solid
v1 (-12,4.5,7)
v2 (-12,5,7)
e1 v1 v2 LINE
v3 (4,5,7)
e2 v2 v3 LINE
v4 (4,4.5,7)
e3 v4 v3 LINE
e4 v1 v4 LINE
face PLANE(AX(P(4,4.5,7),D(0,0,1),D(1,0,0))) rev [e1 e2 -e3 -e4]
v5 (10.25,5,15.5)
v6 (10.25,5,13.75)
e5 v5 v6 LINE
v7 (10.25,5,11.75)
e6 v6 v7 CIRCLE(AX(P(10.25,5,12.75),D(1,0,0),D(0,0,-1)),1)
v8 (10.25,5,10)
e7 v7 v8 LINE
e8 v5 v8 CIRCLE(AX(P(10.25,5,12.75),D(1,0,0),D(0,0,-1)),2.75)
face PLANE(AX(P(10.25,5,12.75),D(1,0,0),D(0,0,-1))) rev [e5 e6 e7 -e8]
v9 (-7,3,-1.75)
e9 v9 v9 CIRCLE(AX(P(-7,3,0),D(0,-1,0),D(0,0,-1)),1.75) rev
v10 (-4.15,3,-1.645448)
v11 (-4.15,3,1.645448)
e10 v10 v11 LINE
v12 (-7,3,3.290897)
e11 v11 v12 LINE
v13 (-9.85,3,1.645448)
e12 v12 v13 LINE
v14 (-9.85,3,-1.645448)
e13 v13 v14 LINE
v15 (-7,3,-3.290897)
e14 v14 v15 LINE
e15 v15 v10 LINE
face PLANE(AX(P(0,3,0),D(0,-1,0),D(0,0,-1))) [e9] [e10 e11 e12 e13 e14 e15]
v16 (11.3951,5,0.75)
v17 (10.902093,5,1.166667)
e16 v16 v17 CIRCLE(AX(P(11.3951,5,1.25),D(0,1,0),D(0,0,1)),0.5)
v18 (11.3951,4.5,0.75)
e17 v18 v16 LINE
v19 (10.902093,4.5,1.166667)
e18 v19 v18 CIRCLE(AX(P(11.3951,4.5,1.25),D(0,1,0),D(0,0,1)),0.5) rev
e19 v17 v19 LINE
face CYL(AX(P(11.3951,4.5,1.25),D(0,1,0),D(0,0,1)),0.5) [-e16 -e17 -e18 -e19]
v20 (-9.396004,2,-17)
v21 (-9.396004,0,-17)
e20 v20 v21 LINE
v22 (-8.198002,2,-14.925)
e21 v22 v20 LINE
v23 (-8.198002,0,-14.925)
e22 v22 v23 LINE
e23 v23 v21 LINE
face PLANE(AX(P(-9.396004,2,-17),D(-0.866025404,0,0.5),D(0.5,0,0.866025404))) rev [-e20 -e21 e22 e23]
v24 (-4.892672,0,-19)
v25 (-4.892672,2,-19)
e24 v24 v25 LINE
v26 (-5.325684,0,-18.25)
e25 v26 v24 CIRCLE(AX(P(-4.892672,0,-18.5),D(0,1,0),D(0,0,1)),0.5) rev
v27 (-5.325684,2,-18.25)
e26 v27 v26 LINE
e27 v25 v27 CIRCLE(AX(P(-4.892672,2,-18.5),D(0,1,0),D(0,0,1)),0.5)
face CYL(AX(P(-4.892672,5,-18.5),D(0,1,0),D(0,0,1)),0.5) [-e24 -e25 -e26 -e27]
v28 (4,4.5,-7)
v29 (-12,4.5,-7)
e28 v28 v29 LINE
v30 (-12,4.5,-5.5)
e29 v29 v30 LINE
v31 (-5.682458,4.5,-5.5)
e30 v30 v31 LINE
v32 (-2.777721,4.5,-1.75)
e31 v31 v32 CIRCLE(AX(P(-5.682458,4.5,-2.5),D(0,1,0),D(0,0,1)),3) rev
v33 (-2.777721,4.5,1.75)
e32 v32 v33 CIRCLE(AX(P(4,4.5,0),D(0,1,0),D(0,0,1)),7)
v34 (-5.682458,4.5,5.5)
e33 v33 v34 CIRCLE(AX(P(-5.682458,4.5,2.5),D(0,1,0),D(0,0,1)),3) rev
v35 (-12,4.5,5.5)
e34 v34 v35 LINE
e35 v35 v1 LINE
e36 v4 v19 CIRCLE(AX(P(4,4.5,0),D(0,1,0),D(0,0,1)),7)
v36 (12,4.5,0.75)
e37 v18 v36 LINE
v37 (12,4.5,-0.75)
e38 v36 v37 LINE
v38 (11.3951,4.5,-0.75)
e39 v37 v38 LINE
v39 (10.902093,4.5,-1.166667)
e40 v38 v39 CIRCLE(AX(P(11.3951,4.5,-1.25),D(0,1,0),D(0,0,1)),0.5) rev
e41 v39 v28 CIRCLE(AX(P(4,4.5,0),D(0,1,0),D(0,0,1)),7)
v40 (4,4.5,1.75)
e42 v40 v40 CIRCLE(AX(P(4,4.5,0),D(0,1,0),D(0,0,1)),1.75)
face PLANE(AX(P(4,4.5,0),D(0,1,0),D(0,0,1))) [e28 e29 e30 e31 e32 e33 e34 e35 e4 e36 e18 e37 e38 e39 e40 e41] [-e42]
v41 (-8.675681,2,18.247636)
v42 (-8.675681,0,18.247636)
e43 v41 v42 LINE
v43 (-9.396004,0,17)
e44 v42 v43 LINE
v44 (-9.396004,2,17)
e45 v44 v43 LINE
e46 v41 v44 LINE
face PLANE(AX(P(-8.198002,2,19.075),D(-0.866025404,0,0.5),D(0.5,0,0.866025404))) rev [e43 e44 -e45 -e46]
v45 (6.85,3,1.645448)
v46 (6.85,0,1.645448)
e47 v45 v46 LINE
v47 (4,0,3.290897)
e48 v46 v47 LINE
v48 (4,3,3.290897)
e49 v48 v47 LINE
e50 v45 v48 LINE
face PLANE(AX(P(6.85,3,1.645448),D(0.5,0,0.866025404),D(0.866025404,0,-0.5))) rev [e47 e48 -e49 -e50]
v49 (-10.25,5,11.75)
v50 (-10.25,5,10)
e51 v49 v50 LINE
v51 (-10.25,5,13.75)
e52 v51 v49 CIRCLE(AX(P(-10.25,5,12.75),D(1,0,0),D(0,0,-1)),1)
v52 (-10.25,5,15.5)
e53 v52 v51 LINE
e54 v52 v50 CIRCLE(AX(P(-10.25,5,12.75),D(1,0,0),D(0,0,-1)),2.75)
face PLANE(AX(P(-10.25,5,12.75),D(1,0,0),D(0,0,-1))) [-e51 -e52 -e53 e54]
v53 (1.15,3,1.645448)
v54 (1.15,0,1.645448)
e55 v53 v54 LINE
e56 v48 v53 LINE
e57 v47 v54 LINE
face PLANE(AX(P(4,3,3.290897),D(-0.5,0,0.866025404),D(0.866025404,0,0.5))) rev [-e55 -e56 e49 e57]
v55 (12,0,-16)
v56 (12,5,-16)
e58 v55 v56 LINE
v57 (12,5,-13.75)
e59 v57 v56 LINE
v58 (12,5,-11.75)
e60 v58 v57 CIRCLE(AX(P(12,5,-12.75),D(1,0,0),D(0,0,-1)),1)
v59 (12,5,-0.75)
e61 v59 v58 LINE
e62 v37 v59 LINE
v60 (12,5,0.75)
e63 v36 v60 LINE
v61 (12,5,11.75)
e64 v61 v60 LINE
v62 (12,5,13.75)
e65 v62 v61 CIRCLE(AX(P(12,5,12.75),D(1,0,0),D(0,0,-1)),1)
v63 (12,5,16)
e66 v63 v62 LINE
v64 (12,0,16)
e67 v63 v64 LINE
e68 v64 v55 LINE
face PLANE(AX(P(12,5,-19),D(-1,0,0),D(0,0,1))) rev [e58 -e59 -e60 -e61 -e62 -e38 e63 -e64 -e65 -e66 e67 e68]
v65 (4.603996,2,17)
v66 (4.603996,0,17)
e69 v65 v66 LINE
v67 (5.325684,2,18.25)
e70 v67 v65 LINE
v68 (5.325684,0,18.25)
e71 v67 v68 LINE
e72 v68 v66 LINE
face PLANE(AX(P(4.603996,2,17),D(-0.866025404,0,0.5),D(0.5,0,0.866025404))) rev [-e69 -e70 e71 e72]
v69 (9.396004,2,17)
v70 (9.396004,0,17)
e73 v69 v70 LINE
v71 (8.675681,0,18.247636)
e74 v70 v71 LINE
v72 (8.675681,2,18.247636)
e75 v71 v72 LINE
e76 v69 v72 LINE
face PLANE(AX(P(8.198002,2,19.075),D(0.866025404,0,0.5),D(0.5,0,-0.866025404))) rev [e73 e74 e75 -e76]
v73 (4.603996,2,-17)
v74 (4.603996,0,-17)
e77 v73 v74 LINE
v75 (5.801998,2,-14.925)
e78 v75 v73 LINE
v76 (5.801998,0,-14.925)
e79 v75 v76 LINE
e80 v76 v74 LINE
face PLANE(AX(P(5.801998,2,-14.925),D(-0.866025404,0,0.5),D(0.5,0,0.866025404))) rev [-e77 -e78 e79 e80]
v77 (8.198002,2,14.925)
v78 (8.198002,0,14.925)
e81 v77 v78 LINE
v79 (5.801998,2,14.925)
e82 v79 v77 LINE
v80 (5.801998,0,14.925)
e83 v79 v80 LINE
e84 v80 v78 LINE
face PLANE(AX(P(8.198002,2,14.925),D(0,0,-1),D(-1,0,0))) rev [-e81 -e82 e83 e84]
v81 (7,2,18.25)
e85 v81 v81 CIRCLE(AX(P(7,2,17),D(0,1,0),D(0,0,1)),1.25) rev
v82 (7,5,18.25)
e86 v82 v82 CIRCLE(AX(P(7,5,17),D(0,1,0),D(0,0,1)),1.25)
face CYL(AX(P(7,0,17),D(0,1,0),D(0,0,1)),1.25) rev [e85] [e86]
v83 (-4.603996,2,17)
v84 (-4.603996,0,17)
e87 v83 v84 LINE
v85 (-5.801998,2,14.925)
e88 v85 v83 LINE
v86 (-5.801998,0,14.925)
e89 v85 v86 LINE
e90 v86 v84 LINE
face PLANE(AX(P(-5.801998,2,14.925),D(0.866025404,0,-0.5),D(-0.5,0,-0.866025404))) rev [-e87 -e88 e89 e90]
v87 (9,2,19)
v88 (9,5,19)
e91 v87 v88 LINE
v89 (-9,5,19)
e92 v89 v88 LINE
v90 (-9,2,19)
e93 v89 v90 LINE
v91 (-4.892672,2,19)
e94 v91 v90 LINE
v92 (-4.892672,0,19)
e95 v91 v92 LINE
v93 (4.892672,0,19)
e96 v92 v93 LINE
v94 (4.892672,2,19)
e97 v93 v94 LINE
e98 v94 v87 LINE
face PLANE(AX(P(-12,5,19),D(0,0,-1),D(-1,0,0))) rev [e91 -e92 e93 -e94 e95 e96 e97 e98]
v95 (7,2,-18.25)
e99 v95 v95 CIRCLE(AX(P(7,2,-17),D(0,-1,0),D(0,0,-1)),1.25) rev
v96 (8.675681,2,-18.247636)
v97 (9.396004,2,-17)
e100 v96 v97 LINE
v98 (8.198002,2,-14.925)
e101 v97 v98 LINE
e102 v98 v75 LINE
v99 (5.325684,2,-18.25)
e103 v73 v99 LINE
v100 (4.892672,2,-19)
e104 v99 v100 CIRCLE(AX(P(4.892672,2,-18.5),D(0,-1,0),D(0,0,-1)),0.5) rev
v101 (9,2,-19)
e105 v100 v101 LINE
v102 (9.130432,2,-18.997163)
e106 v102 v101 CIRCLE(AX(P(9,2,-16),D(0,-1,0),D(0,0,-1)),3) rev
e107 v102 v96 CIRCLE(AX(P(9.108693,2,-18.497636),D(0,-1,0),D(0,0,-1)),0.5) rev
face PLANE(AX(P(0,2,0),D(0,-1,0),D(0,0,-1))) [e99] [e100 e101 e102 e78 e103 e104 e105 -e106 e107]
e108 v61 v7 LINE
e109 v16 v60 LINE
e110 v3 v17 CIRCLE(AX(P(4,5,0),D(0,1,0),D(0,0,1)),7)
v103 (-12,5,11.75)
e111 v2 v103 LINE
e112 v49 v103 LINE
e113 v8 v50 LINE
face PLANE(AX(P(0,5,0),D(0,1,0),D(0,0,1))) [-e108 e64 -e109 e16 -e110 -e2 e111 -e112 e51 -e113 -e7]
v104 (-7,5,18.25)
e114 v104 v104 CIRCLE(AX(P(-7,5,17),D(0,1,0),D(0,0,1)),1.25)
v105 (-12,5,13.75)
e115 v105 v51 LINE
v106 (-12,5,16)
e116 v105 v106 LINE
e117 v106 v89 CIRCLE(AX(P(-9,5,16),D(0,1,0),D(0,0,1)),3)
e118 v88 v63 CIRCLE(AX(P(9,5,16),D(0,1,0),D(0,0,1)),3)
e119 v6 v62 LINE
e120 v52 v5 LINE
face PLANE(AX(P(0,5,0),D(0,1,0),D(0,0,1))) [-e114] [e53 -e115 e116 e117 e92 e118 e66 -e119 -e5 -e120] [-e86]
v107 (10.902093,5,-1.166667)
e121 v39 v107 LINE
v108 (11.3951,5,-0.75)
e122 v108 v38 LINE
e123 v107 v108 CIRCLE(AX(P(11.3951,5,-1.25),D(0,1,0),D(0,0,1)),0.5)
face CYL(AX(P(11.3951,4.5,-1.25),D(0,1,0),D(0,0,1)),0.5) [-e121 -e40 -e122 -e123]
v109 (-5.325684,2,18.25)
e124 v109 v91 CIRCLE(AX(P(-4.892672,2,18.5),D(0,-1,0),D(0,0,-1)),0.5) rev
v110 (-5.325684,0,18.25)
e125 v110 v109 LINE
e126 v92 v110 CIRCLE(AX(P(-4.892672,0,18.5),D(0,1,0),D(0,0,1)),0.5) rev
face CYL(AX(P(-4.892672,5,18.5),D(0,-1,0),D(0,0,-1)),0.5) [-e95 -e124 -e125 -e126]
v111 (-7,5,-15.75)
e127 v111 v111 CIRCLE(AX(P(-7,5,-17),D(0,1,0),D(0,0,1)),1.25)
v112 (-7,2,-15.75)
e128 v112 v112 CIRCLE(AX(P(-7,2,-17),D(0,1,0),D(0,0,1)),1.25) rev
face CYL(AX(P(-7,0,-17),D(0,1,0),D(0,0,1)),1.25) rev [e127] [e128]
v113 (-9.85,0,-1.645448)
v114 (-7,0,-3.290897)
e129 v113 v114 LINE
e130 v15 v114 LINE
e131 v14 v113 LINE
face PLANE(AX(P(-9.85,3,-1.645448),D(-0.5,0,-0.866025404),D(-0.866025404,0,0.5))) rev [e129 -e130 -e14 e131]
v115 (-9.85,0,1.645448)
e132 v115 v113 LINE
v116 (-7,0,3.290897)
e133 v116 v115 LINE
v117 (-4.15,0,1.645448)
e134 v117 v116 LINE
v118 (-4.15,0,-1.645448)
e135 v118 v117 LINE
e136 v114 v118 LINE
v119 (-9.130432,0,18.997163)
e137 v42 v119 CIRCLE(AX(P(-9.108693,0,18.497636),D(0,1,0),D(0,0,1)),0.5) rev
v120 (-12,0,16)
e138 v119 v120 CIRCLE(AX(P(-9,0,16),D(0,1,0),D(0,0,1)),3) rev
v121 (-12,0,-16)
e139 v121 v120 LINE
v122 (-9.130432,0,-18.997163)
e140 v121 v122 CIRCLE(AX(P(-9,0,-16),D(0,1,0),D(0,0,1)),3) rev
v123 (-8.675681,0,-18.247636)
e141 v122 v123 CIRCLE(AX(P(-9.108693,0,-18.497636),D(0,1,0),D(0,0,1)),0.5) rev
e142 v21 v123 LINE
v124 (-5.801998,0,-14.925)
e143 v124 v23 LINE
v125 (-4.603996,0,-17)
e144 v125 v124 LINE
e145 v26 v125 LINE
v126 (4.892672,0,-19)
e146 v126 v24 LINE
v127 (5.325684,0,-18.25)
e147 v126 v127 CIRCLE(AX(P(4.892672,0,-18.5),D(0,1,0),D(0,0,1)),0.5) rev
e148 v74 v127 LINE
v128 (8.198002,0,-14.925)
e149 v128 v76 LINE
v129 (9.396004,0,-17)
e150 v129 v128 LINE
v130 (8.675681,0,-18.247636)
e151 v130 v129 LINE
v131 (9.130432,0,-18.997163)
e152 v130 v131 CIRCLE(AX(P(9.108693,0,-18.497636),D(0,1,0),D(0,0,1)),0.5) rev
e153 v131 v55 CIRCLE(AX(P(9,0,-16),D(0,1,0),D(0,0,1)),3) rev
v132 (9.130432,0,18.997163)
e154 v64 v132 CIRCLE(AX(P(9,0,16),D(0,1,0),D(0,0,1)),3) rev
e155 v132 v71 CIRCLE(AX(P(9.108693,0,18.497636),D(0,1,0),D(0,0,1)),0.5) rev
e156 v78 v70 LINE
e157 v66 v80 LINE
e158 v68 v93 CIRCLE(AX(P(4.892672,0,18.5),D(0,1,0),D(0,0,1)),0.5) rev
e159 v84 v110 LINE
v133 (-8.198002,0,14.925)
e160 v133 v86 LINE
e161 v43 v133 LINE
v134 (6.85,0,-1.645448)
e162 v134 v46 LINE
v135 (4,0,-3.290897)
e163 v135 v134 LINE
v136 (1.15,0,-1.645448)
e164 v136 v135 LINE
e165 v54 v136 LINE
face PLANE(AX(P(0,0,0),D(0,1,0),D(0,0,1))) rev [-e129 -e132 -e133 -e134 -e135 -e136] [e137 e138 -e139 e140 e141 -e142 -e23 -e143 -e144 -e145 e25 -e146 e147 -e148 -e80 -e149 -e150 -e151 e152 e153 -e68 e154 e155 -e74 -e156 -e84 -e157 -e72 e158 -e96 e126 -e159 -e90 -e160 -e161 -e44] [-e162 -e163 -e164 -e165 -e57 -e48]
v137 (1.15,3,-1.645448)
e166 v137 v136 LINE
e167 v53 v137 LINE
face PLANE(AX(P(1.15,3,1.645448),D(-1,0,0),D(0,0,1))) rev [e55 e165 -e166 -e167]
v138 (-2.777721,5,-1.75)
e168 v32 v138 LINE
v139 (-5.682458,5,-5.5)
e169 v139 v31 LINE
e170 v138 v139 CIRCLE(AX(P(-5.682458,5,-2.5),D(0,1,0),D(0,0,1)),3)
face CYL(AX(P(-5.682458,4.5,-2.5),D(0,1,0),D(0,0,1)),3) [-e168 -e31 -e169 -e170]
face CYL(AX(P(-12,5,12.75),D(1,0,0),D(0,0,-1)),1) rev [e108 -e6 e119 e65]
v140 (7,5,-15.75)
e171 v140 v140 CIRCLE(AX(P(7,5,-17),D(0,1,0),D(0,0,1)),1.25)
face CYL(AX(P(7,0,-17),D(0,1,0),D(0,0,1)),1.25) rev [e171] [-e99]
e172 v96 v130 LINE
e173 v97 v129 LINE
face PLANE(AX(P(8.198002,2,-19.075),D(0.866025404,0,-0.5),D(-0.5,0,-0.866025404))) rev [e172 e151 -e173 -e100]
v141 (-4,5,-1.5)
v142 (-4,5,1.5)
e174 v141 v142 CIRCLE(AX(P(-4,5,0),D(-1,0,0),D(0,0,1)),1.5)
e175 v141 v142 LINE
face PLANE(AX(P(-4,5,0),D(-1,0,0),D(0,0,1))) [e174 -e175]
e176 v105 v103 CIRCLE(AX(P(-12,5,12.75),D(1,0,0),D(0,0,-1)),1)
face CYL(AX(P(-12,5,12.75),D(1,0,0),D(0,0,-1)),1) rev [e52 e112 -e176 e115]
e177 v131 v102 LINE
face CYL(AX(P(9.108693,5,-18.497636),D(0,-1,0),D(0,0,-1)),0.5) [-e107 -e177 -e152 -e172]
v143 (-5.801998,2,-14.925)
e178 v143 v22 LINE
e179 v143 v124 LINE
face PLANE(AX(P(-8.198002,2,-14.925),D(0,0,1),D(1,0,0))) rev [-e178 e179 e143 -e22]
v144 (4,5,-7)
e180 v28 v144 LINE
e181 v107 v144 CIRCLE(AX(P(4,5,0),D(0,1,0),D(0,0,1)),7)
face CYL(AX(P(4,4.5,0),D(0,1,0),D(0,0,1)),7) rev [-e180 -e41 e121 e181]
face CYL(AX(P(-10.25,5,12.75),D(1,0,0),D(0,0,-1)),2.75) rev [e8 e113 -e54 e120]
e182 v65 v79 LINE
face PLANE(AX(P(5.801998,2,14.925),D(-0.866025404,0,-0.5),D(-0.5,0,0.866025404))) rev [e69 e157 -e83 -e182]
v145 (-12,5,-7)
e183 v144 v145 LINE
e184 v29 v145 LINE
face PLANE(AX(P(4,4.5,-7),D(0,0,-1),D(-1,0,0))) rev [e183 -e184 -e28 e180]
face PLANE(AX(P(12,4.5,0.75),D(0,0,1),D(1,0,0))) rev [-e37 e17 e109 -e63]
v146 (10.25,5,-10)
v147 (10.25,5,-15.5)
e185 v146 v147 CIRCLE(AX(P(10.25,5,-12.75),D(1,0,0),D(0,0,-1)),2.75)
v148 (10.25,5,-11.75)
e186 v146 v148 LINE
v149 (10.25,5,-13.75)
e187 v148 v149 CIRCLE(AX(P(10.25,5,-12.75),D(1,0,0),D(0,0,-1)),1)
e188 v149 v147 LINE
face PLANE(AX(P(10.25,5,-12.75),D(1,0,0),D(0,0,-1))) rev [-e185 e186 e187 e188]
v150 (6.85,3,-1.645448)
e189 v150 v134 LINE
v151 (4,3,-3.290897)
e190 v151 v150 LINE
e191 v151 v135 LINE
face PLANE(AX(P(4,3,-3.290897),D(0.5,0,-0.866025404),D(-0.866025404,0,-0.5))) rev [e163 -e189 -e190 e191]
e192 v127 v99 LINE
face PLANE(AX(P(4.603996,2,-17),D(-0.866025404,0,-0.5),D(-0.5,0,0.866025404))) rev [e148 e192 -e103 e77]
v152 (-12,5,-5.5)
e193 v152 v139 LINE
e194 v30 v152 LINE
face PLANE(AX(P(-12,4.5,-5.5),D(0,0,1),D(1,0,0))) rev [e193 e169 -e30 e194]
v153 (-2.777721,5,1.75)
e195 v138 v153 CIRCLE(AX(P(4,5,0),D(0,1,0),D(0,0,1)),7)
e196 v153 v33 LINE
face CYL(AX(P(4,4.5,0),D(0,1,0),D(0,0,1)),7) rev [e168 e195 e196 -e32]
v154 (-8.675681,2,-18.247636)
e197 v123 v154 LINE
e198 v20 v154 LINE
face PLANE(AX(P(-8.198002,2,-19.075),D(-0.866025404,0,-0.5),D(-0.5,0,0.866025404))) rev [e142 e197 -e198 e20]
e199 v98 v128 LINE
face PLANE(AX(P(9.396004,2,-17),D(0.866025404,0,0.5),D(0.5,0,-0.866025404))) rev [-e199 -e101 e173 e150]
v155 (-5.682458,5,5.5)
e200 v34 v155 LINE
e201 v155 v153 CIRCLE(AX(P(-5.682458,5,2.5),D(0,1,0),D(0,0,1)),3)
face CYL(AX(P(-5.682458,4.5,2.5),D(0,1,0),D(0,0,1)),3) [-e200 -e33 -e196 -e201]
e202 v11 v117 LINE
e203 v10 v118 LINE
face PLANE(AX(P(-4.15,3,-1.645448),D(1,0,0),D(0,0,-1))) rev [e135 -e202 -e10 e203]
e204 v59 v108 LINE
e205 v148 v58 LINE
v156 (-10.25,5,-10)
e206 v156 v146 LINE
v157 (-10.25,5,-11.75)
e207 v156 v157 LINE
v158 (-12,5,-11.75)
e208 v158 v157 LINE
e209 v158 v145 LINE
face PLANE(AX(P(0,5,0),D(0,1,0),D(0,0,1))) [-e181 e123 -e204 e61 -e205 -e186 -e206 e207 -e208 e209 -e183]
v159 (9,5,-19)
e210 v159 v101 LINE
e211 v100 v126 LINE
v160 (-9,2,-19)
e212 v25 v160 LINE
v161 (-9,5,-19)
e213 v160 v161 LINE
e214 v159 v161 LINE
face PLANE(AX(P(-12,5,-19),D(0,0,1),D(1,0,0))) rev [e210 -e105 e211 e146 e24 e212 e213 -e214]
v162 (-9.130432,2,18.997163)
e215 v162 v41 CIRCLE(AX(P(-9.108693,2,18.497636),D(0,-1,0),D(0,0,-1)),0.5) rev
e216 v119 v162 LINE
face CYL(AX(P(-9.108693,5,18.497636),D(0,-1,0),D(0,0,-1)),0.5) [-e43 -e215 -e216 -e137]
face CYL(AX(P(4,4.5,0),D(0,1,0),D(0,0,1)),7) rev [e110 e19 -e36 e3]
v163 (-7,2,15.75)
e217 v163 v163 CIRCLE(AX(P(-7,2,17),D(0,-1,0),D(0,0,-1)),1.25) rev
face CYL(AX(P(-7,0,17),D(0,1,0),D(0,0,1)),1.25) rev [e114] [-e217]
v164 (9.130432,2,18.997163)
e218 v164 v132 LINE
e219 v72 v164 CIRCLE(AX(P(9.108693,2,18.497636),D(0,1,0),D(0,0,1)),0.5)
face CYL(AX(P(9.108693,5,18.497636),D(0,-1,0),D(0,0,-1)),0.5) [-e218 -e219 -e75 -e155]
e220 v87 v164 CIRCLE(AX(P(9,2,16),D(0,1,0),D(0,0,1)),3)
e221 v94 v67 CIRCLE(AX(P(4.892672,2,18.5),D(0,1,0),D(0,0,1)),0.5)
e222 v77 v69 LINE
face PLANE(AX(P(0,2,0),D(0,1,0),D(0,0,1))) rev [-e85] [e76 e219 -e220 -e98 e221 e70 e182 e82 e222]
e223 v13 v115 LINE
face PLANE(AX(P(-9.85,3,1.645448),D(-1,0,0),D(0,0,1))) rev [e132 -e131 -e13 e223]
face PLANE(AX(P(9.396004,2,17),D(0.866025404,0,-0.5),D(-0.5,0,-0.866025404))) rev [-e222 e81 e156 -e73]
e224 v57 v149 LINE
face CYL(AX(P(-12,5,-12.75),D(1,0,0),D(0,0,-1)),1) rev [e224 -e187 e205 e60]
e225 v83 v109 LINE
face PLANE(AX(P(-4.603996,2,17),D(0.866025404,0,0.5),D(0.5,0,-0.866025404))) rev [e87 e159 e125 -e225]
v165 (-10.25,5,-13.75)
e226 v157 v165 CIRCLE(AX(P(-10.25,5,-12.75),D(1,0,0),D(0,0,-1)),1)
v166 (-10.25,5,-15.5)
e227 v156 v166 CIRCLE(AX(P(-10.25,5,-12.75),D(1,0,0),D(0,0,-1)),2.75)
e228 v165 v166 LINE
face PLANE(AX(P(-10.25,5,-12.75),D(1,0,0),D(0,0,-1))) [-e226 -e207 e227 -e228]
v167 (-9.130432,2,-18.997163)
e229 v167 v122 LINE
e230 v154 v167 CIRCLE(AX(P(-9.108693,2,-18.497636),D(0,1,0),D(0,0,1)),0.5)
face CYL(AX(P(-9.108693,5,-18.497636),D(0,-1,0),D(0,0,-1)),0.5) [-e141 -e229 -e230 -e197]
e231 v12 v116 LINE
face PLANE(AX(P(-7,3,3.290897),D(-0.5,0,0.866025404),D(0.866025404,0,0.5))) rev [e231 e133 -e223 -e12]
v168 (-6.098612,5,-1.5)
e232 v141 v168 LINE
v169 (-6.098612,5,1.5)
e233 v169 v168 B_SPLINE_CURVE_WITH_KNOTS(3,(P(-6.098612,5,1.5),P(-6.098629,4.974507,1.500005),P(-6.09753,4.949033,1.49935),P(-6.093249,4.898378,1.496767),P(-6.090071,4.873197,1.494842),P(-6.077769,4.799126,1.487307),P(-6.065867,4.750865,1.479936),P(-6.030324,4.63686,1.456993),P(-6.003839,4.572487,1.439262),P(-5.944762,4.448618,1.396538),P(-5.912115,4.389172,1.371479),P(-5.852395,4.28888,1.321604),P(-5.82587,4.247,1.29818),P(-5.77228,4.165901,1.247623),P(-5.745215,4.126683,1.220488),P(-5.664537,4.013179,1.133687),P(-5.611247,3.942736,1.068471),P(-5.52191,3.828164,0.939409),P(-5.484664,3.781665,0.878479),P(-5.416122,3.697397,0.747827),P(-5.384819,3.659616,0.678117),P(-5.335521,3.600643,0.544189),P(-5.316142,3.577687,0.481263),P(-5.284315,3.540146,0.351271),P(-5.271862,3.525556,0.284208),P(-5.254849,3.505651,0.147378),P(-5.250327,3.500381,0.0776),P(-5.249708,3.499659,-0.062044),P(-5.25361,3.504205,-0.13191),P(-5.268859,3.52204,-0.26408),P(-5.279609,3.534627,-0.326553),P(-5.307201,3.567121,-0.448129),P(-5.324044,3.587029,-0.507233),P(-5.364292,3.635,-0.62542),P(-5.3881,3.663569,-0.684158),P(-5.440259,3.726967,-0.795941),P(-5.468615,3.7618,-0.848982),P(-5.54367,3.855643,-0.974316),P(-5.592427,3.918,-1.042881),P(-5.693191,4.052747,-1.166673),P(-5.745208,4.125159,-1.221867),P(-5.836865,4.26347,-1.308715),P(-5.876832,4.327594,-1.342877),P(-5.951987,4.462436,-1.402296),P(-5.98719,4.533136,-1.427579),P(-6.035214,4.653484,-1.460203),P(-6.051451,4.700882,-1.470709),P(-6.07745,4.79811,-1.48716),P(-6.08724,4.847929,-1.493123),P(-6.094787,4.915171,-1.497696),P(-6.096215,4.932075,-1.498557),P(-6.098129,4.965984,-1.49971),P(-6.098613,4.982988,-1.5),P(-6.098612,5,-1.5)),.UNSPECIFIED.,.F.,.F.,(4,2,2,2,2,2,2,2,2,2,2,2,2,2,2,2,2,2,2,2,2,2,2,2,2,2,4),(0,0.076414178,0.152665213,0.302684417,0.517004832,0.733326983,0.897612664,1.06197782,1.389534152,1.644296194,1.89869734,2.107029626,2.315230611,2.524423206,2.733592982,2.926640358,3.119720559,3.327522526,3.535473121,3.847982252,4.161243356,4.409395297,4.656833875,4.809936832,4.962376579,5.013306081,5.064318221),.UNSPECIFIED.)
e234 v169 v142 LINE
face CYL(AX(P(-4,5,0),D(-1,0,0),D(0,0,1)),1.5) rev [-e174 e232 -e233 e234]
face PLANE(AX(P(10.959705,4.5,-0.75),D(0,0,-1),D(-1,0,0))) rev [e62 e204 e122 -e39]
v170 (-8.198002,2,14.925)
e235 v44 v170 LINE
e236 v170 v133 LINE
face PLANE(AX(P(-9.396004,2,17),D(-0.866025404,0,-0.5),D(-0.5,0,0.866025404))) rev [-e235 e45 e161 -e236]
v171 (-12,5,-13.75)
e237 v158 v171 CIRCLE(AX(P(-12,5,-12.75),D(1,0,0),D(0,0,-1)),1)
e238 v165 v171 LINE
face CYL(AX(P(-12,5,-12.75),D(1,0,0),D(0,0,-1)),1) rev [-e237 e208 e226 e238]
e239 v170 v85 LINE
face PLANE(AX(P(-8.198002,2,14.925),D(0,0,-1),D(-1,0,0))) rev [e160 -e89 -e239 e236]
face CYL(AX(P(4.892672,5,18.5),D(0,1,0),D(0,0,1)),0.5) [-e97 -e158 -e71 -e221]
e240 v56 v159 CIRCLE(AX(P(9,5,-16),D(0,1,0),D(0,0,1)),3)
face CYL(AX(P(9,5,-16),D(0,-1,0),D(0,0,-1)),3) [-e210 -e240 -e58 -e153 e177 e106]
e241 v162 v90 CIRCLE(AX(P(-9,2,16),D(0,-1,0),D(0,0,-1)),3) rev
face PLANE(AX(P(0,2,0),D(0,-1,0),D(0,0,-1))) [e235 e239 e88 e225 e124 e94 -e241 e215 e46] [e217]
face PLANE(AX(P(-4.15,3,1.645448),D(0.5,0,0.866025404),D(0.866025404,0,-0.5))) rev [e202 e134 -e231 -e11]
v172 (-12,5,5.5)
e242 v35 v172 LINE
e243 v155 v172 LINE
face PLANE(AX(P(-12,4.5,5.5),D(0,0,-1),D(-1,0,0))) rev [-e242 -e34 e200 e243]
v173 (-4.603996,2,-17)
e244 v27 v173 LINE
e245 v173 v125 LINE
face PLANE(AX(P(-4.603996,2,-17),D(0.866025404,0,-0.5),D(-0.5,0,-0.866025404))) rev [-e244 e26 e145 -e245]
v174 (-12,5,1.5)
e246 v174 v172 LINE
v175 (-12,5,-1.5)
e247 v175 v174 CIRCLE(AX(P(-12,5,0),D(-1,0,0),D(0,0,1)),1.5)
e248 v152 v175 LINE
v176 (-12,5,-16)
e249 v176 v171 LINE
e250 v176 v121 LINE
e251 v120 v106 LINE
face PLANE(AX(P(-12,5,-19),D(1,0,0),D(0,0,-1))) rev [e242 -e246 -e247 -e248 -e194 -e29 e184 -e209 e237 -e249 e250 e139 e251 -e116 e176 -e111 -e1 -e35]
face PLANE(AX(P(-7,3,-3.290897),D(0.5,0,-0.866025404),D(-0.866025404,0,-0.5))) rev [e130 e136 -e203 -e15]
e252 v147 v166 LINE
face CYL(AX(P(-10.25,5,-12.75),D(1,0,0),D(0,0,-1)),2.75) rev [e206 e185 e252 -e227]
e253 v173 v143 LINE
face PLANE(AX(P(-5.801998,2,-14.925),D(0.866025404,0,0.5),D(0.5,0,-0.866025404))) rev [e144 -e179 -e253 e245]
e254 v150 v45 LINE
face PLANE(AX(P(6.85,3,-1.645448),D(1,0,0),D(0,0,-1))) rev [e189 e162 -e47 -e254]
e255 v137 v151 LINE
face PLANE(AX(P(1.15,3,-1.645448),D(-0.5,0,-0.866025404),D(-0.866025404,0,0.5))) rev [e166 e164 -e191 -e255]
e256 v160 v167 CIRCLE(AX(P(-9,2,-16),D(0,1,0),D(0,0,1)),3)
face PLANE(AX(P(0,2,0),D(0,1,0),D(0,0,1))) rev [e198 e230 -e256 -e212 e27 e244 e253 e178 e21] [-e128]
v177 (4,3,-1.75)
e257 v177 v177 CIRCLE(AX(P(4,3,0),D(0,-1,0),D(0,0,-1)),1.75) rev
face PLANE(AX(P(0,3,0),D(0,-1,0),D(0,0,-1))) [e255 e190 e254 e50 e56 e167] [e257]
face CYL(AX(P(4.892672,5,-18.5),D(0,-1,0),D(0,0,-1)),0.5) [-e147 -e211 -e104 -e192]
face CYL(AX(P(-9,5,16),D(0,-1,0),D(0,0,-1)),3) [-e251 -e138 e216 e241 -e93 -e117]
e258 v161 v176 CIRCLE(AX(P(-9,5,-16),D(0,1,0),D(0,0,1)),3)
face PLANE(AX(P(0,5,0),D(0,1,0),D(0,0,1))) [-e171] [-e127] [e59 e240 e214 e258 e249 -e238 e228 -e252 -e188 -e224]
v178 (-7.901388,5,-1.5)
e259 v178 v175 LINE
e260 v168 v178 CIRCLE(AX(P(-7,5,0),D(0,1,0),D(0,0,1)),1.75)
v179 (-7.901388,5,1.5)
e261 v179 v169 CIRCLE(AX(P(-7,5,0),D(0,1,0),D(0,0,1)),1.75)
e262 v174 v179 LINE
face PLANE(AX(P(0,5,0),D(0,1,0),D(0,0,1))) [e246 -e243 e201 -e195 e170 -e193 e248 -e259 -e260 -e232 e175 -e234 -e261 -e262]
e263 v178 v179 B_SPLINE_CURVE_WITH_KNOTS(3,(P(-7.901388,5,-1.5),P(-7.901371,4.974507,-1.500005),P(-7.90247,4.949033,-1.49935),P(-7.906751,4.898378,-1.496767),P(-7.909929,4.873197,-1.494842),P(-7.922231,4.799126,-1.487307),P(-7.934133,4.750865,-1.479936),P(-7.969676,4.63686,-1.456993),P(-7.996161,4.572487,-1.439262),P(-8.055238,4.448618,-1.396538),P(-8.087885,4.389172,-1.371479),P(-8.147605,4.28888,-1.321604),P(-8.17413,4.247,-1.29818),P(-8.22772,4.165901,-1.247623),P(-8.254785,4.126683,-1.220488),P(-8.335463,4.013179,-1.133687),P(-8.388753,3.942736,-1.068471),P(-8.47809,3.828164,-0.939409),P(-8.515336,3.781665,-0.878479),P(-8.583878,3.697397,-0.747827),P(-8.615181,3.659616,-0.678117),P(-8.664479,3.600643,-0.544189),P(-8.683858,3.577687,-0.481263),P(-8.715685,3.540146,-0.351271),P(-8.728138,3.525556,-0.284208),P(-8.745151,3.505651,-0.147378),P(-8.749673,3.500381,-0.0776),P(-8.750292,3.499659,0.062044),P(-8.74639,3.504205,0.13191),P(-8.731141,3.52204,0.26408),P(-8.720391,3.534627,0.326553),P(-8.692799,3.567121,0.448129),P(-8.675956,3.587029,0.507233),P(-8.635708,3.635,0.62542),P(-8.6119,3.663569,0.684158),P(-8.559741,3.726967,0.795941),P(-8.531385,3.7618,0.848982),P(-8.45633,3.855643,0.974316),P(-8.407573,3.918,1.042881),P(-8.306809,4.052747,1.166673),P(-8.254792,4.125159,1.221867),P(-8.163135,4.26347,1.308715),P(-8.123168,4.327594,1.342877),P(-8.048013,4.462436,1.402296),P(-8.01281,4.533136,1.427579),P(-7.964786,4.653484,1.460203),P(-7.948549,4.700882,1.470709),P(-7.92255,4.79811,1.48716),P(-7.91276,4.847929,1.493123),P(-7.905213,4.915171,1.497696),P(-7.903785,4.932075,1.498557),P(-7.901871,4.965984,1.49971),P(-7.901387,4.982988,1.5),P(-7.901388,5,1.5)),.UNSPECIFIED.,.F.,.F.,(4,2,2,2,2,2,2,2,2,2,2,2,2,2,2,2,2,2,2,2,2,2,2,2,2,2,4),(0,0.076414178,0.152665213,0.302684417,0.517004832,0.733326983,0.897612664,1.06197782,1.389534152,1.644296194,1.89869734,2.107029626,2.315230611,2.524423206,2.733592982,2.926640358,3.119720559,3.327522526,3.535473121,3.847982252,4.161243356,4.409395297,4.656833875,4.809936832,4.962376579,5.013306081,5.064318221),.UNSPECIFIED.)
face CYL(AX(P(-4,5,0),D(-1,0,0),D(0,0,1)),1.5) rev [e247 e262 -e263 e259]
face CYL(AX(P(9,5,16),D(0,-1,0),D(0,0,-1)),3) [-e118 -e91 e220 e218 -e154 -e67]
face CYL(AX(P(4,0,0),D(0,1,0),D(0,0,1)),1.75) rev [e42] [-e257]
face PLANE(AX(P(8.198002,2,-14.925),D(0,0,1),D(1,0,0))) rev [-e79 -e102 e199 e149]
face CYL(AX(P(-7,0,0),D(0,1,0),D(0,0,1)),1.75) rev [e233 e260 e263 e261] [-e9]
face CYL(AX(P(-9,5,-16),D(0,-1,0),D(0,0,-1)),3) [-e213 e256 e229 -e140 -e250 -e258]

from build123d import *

# Parameters (mm, degrees)
SKETCH_1_W               = 24
SKETCH_1_H               = 38
EXTRUDE_1_DEPTH          = 5
SKETCH_2_R               = 2.75
CUT_EXTRUDE_1_DEPTH      = 10.25
CUT_EXTRUDE_2_DEPTH      = 24.021728866
CUT_EXTRUDE_2_DEPTH_BACK = 24.021728866
SKETCH_3_R               = 1
CUT_EXTRUDE_3_DEPTH      = 0.5
SKETCH_5_R               = 1.75
CUT_EXTRUDE_4_DEPTH      = 24.021728866
FILLET_1_R               = 3
FILLET_2_R               = 3
SKETCH_6_R               = 1.5
CUT_EXTRUDE_5_DEPTH      = 8
FILLET_3_R               = 0.5
SKETCH_7_R               = 1.25
CUT_EXTRUDE_6_DEPTH      = 24.02172894
CUT_EXTRUDE_9_DEPTH      = 3
CUT_EXTRUDE_10_DEPTH     = 2
FILLET_4_R               = 0.5


with BuildPart() as part:
    # Эскиз1 → Бобышка-Вытянуть1 (new body)
    with BuildSketch(Plane(origin=(0, 0, 0), x_dir=(1, 0, 0), z_dir=(0, 1, 0))):
        Rectangle(SKETCH_1_W, SKETCH_1_H)
    extrude(amount=EXTRUDE_1_DEPTH)

    # Эскиз2 → Вырез-Вытянуть1 (cut, symmetric)
    with BuildSketch(Plane(origin=(0, 0, 0), x_dir=(0, 0, -1), z_dir=(1, 0, 0))):
        with Locations((-12.75, 5)):
            Circle(SKETCH_2_R)
        with Locations((12.75, 5)):
            Circle(SKETCH_2_R)
    extrude(amount=CUT_EXTRUDE_1_DEPTH, both=True, mode=Mode.SUBTRACT)

    # Эскиз3 → Вырез-Вытянуть2 (cut, two sides: drawn at the far end of the back side and taken through both)
    with BuildSketch(Plane(origin=(0, 0, 0), x_dir=(0, 0, -1), z_dir=(1, 0, 0)).offset(-CUT_EXTRUDE_2_DEPTH_BACK)):
        with Locations((-12.75, 5)):
            Circle(SKETCH_3_R)
        with Locations((12.75, 5)):
            Circle(SKETCH_3_R)
    extrude(amount=CUT_EXTRUDE_2_DEPTH + CUT_EXTRUDE_2_DEPTH_BACK, mode=Mode.SUBTRACT)

    # Эскиз4 → Вырез-Вытянуть3 (cut)
    with BuildSketch(Plane(origin=(0, 5, 0), x_dir=(1, 0, 0), z_dir=(0, 1, 0))):
        with BuildLine():
            Line((4, 7), (-12, 7))
            Line((-12, 7), (-12, 5.5))
            Line((-12, 5.5), (-0.330127019, 5.5))
            ThreePointArc((-0.330127019, 5.5), (-3, 0), (-0.330127019, -5.5))
            Line((-0.330127019, -5.5), (-12, -5.5))
            Line((-12, -5.5), (-12, -7))
            Line((-12, -7), (4, -7))
            ThreePointArc((4, -7), (8.677071733, -5.208166664), (10.959705454, -0.75))
            Line((10.959705454, -0.75), (12, -0.75))
            Line((12, -0.75), (12, 0.75))
            Line((12, 0.75), (10.959705454, 0.75))
            ThreePointArc((10.959705454, 0.75), (8.677071733, 5.208166664), (4, 7))
        make_face()
    extrude(amount=-CUT_EXTRUDE_3_DEPTH, mode=Mode.SUBTRACT)

    # Эскиз5 → Вырез-Вытянуть4 (cut, through all)
    with BuildSketch(Plane(origin=(0, 5, 0), x_dir=(1, 0, 0), z_dir=(0, 1, 0))):
        with Locations(Location((4, 0, 0), (0, 0, 270))):
            Circle(SKETCH_5_R)
        with Locations(Location((-7, 0, 0), (0, 0, 270))):
            Circle(SKETCH_5_R)
    extrude(amount=-CUT_EXTRUDE_4_DEPTH, mode=Mode.SUBTRACT)

    # Скругление1
    fillet_1_edges = [part.edges().sort_by_distance(p)[0] for p in [
        (-0.330127019, 4.75, 5.5),
        (-0.330127019, 4.75, -5.5),
    ]]
    fillet(fillet_1_edges, radius=FILLET_1_R)

    # Скругление2
    fillet_2_edges = [part.edges().sort_by_distance(p)[0] for p in [
        (12, 2.5, 19),
        (-12, 2.5, 19),
        (-12, 2.5, -19),
        (12, 2.5, -19),
    ]]
    fillet(fillet_2_edges, radius=FILLET_2_R)

    # Эскиз6 → Вырез-Вытянуть5 (cut)
    with BuildSketch(Plane.ZY.offset(12)):
        with Locations((0, 5)):
            Circle(SKETCH_6_R)
    extrude(amount=-CUT_EXTRUDE_5_DEPTH, mode=Mode.SUBTRACT)

    # Скругление3
    fillet_3_edges = [part.edges().sort_by_distance(p)[0] for p in [
        (10.959705454, 4.75, -0.75),
        (10.959705454, 4.75, 0.75),
    ]]
    fillet(fillet_3_edges, radius=FILLET_3_R)

    # Эскиз7 → Вырез-Вытянуть6 (cut, through all)
    with BuildSketch(Plane(origin=(0, 5, 0), x_dir=(1, 0, 0), z_dir=(0, 1, 0))):
        with Locations(Location((-7, 17, 0), (0, 0, 270))):
            Circle(SKETCH_7_R)
        with Locations(Location((7, 17, 0), (0, 0, 270))):
            Circle(SKETCH_7_R)
        with Locations(Location((7, -17, 0), (0, 0, 270))):
            Circle(SKETCH_7_R)
        with Locations(Location((-7, -17, 0), (0, 0, 270))):
            Circle(SKETCH_7_R)
    extrude(amount=-CUT_EXTRUDE_6_DEPTH, mode=Mode.SUBTRACT)

    # Эскиз9 → Вырез-Вытянуть9 (cut)
    with BuildSketch(Plane.XZ):
        Polygon((-7, 3.290896534), (-9.85, 1.645448267), (-9.85, -1.645448267), (-7, -3.290896534), (-4.15, -1.645448267), (-4.15, 1.645448267), align=None)
        Polygon((6.85, -1.645448267), (6.85, 1.645448267), (4, 3.290896534), (1.15, 1.645448267), (1.15, -1.645448267), (4, -3.290896534), align=None)
    extrude(amount=-CUT_EXTRUDE_9_DEPTH, mode=Mode.SUBTRACT)

    # Эскиз10 → Вырез-Вытянуть10 (cut)
    with BuildSketch(Plane.XZ):
        Polygon((8.198001809, 14.925), (5.801998191, 14.925), (4.603996383, 17), (5.801998191, 19.075), (8.198001809, 19.075), (9.396003617, 17), align=None)
        Polygon((-5.801998191, 14.925), (-4.603996383, 17), (-5.801998191, 19.075), (-8.198001809, 19.075), (-9.396003617, 17), (-8.198001809, 14.925), align=None)
        Polygon((9.396003617, -17), (8.198001809, -14.925), (5.801998191, -14.925), (4.603996383, -17), (5.801998191, -19.075), (8.198001809, -19.075), align=None)
        Polygon((-8.198001809, -14.925), (-5.801998191, -14.925), (-4.603996383, -17), (-5.801998191, -19.075), (-8.198001809, -19.075), (-9.396003617, -17), align=None)
    extrude(amount=-CUT_EXTRUDE_10_DEPTH, mode=Mode.SUBTRACT)

    # Скругление4
    # the kernel refuses this fillet: 0.5 mm, written as the material it takes off along each edge
    with BuildSketch(Plane(origin=(-8.241303079, 2, 19), x_dir=(-0.9999949104209014, 0, -0.003190475245701581), z_dir=(0, -1, 0)), Plane(origin=(8.241303079, 2, -19), x_dir=(0.9999949104209014, 0, 0.003190475245705545), z_dir=(0, -1, 0))) as fillet_4_piece_1:
        with BuildLine():
            CenterArc((0.868988605, 0.499594021), FILLET_4_R, 149.817198924, 122.491852834)
            Line((0.436775726, 0.750974265), (0.393554438, 0.77611229))
            Line((0.393554438, 0.77611229), (-0.043221288, 0.025138024))
            Line((-0.043221288, 0.025138024), (-0.000159524, -0.049999746))
            ThreePointArc((-0.000159524, -0.049999746), (0.758533536, -0.052420349), (0.891147911, -0.049959402))
            Line((0.891147911, -0.049959402), (0.889133429, 0))
        make_face()
    extrude(amount=4.222833572, mode=Mode.SUBTRACT)
    with BuildSketch(Plane(origin=(-5.758696921, -2.165063509, 19), x_dir=(1, 0, 0), z_dir=(0, 1, 0)), Plane(origin=(5.758696921, -2.165063509, -19), x_dir=(-1, 0, 0), z_dir=(0, 1, 0))) as fillet_4_piece_2:
        with BuildLine():
            CenterArc((FILLET_4_R * 1.73205080757, FILLET_4_R), FILLET_4_R, 150, 120)
            Line((FILLET_4_R * 0.866025403784, FILLET_4_R * 1.5), (0, 0))
            Line((0, 0), (FILLET_4_R * 1.73205080757, 0))
        make_face()
    extrude(amount=4.165063509, mode=Mode.SUBTRACT)
    with BuildSketch(Plane(origin=(-5.758696921, -2.165063509, -19), x_dir=(1, 0, 0), z_dir=(0, 1, 0)), Plane(origin=(5.758696921, -2.165063509, 19), x_dir=(-1, 0, 0), z_dir=(0, 1, 0))) as fillet_4_piece_3:
        with BuildLine():
            CenterArc((FILLET_4_R * 1.73205080757, -FILLET_4_R), FILLET_4_R, 90, 120)
            Line((FILLET_4_R * 0.866025403784, -FILLET_4_R * 1.5), (0, 0))
            Line((0, 0), (FILLET_4_R * 1.73205080757, 0))
        make_face()
    extrude(amount=4.165063509, mode=Mode.SUBTRACT)
    with BuildSketch(Plane(origin=(-8.241303079, 2, -19), x_dir=(-0.9999949104209014, 0, 0.0031904752457015684), z_dir=(0, -1, 0)), Plane(origin=(8.241303079, 2, 19), x_dir=(0.9999949104209014, 0, -0.003190475245701575), z_dir=(0, -1, 0))) as fillet_4_piece_4:
        with BuildLine():
            CenterArc((0.868988605, -0.499594021), FILLET_4_R, 87.690948243, 122.491852834)
            Line((0.436775726, -0.750974265), (0.393554438, -0.77611229))
            Line((0.393554438, -0.77611229), (-0.043221288, -0.025138024))
            Line((-0.043221288, -0.025138024), (-0.000159524, 0.049999746))
            ThreePointArc((-0.000159524, 0.049999746), (0.758533536, 0.052420349), (0.891147911, 0.049959402))
            Line((0.891147911, 0.049959402), (0.889133429, 0))
        make_face()
    extrude(amount=4.222833572, mode=Mode.SUBTRACT)


solid = part.part
